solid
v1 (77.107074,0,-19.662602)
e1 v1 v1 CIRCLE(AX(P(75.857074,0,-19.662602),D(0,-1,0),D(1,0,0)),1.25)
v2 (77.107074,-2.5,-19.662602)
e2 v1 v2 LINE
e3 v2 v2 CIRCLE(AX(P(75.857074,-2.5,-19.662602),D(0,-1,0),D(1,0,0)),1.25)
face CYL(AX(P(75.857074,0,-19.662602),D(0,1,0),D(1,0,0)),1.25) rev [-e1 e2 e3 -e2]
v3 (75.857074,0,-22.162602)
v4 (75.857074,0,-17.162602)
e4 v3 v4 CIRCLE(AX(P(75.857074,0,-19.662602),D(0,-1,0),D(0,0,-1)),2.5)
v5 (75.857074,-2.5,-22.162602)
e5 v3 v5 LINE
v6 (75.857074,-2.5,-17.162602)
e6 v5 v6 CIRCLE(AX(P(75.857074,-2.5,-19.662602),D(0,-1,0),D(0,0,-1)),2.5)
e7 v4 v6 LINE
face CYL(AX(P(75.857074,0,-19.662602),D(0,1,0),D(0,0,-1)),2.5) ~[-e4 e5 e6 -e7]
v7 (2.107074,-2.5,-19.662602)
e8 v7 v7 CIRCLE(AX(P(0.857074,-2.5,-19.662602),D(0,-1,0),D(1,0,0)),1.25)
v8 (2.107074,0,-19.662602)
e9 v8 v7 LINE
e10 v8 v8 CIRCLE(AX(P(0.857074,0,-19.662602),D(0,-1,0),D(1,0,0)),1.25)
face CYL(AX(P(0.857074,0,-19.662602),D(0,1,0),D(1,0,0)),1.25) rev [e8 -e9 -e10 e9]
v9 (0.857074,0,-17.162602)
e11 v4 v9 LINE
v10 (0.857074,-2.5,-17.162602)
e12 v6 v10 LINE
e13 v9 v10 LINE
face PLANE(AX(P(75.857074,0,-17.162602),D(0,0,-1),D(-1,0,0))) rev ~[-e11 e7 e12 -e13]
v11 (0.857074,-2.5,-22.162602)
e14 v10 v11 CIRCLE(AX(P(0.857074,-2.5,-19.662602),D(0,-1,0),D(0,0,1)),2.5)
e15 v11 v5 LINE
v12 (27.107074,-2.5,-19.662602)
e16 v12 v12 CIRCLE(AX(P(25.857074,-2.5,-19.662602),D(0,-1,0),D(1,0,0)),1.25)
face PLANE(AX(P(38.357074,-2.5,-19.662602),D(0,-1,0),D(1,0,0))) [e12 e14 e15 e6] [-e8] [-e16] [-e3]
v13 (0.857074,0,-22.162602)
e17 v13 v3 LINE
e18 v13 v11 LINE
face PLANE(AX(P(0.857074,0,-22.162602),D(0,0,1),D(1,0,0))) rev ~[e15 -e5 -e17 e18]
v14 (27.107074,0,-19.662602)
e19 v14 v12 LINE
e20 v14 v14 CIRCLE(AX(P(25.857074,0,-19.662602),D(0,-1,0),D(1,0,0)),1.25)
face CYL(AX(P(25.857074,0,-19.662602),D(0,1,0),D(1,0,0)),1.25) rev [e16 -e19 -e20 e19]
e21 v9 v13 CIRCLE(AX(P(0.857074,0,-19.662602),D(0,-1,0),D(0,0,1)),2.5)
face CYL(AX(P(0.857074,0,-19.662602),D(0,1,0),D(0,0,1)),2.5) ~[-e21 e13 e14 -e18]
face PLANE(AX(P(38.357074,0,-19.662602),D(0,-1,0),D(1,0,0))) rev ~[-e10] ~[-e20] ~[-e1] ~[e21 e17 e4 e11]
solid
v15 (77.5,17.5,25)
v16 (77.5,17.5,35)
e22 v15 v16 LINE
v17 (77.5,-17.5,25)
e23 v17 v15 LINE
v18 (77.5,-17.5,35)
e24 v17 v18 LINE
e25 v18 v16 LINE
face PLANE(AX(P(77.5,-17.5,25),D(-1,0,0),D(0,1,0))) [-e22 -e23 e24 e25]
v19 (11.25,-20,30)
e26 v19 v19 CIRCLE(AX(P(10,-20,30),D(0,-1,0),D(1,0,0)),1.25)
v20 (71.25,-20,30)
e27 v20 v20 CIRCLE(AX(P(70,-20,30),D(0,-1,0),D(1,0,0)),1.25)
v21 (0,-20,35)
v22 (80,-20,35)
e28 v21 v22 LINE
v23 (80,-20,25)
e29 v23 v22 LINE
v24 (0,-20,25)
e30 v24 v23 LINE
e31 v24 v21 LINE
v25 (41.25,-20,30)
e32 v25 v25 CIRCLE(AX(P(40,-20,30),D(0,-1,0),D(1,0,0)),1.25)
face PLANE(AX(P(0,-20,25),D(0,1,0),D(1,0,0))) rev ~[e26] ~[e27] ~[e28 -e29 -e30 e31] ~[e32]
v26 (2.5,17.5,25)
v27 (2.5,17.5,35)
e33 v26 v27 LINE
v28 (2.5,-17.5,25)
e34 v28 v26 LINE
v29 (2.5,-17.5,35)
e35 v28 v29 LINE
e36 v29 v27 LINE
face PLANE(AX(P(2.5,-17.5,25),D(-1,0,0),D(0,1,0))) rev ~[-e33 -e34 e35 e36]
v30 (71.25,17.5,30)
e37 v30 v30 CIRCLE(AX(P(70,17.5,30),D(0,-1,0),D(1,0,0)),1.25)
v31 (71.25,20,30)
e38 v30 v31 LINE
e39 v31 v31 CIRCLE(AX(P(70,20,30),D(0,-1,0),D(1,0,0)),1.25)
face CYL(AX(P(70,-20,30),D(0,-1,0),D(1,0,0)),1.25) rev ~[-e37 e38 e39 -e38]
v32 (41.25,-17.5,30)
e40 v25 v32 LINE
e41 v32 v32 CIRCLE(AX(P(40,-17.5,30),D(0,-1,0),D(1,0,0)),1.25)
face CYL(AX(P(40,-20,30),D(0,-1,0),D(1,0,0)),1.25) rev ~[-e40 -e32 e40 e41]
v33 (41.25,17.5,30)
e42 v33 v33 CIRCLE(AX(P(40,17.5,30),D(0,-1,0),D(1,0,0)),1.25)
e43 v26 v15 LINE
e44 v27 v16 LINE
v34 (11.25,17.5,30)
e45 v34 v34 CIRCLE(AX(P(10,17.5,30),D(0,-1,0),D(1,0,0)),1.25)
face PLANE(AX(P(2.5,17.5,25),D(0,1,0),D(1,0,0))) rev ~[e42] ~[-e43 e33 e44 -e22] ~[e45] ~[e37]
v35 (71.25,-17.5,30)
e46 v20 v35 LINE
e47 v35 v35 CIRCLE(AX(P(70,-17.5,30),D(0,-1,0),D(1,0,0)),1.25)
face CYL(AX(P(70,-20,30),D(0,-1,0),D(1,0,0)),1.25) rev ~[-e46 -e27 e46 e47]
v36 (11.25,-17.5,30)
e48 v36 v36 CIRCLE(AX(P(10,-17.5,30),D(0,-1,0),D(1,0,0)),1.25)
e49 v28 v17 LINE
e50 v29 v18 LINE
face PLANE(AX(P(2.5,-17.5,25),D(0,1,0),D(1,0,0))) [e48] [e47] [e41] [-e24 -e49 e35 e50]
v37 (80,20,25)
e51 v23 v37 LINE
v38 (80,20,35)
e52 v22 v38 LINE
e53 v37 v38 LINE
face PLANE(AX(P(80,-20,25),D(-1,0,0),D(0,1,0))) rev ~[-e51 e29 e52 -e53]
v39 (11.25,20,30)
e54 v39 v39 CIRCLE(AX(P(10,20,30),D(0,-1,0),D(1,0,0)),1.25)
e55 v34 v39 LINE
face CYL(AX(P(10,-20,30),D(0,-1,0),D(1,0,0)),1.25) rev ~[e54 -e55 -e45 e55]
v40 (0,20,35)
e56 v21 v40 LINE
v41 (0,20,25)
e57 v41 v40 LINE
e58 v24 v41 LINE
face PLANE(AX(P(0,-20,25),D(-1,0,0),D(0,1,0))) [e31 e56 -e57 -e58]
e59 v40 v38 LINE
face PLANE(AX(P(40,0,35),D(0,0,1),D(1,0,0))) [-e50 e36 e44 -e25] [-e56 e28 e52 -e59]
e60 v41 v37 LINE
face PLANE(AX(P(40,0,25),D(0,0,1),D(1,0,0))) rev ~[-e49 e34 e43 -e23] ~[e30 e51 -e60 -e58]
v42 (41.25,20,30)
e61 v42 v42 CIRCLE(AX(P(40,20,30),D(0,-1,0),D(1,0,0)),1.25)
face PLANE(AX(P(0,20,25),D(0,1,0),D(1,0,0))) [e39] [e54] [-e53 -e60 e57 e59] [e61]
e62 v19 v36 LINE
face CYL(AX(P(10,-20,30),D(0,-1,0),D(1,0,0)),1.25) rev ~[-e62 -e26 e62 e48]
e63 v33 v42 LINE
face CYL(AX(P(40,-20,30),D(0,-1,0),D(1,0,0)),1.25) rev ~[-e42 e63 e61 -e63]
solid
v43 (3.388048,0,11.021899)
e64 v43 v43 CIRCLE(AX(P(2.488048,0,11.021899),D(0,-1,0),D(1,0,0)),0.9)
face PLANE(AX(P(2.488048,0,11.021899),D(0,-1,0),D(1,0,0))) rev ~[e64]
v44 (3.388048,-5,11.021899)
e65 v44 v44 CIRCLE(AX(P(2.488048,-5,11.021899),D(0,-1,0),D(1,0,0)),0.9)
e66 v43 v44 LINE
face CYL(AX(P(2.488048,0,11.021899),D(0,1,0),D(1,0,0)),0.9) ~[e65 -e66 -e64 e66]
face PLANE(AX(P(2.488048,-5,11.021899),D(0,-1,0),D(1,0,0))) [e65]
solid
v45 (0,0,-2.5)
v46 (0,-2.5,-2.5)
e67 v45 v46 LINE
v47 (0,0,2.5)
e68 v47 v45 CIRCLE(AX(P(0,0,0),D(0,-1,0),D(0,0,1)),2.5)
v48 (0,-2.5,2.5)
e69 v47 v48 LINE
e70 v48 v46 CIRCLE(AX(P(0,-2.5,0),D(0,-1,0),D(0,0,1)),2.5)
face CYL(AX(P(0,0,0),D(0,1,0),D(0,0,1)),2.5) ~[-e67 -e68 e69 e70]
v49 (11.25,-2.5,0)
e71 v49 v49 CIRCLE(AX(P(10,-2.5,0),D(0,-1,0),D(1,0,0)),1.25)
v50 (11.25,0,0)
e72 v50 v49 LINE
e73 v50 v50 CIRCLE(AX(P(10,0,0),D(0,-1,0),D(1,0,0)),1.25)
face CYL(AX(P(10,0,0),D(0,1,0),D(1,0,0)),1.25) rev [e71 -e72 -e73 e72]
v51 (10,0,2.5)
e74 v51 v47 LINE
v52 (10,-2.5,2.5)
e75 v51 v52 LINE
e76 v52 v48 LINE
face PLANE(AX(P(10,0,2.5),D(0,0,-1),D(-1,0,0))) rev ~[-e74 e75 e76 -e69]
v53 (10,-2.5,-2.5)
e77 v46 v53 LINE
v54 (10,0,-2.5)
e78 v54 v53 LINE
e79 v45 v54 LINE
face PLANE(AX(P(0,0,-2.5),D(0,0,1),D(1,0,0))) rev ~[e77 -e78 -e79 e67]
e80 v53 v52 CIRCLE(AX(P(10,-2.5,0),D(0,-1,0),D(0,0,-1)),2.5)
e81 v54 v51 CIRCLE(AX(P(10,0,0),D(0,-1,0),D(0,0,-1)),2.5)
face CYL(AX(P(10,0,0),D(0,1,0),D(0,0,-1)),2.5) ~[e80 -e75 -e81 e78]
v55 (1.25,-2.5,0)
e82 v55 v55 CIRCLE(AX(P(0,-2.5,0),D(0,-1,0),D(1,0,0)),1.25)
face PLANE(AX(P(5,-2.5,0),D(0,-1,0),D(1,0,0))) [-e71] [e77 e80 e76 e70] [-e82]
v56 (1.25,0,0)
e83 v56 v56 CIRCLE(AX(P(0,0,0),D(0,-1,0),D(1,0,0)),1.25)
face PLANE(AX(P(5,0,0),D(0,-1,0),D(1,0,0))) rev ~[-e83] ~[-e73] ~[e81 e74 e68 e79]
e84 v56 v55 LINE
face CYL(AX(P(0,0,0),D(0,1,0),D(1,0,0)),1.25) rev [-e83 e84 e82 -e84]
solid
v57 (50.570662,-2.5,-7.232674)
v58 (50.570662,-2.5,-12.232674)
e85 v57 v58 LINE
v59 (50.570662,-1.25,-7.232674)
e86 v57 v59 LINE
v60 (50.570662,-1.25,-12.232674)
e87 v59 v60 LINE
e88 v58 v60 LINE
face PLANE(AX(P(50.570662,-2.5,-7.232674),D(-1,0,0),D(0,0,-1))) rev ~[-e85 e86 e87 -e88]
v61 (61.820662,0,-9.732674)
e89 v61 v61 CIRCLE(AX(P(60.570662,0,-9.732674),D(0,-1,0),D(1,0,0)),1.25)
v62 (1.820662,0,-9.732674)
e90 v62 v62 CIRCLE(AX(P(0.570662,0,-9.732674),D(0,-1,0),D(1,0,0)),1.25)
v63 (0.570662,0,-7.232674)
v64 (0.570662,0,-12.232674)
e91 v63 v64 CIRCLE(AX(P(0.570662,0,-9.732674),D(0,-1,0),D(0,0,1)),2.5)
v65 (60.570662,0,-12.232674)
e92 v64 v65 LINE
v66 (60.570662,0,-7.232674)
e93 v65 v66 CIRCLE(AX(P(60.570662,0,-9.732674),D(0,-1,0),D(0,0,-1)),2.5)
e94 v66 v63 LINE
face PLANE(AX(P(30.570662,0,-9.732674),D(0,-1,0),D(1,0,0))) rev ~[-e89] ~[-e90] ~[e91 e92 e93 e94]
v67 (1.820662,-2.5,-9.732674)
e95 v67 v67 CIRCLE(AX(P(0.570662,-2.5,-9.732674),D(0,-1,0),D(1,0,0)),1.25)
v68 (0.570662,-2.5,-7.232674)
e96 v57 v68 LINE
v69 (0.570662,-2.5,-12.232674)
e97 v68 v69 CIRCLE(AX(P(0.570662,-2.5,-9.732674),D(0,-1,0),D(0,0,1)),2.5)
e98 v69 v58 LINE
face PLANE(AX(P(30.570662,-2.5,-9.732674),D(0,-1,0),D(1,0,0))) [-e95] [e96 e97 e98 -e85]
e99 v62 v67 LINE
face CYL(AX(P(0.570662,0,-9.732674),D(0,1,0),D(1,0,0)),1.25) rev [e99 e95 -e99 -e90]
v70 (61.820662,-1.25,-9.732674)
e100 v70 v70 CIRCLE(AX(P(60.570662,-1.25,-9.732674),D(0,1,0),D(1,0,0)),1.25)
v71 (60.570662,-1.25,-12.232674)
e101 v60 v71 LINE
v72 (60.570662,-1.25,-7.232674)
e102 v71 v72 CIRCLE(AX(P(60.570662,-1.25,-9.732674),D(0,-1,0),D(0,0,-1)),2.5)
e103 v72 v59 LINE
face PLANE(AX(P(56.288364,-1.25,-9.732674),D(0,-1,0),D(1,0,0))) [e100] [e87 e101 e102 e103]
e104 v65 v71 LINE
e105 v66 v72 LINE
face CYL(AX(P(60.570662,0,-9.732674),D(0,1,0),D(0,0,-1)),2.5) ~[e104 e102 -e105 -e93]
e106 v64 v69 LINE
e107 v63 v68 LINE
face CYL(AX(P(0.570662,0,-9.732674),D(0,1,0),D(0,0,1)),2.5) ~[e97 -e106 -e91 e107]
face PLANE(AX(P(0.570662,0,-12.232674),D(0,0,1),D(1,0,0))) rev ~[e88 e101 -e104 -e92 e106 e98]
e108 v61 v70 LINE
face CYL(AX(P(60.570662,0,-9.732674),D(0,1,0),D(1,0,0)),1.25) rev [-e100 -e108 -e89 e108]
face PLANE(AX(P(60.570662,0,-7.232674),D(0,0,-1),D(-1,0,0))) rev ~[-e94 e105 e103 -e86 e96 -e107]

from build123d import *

# Parameters (mm, degrees)
F1_R      = 1.25
F2_DEPTH  = 2.5
F3_R      = 1.25
F4_DEPTH  = 2.5
F5_R      = 1.25
F6_DEPTH  = 2.5
F8_W      = 80
F8_H      = 40
F8_W_2    = 75
F8_H_2    = 35
F9_DEPTH  = 10
F10_R     = 1.25
F11_DEPTH = 40.001
F12_R     = 0.9
F13_DEPTH = 5
F15_DEPTH = 1.25


with BuildPart() as f2:
    # F1 (on Front) → F2 (new body)
    with BuildSketch(Plane.XZ):
        with BuildLine():
            Line((10, 2.5), (0, 2.5))
            ThreePointArc((0, 2.5), (-2.5, 0), (0, -2.5))
            Line((0, -2.5), (10, -2.5))
            ThreePointArc((10, -2.5), (12.5, 0), (10, 2.5))
        make_face()
        Circle(F1_R, mode=Mode.SUBTRACT)
        with Locations((10, 0)):
            Circle(F1_R, mode=Mode.SUBTRACT)
    extrude(amount=F2_DEPTH)


with BuildPart() as f4:
    # F3 (on Front) → F4 (new body)
    with BuildSketch(Plane.XZ):
        with BuildLine():
            Line((60.5706622079, -7.232673876), (0.5706622079, -7.232673876))
            ThreePointArc((0.5706622079, -7.232673876), (-1.9293377921, -9.732673876), (0.5706622079, -12.232673876))
            Line((0.5706622079, -12.232673876), (60.5706622079, -12.232673876))
            ThreePointArc((60.5706622079, -12.232673876), (63.0706622079, -9.732673876), (60.5706622079, -7.232673876))
        make_face()
        with Locations((0.5706622079, -9.732673876)):
            Circle(F3_R, mode=Mode.SUBTRACT)
        with Locations((60.5706622079, -9.732673876)):
            Circle(F3_R, mode=Mode.SUBTRACT)
    extrude(amount=F4_DEPTH)

    # F14 (on face) → F15 (cut)
    with BuildSketch(Plane.XZ.offset(2.5)):
        with BuildLine():
            Line((50.5706622079, -12.232673876), (60.5706622079, -12.232673876))
            ThreePointArc((60.5706622079, -12.232673876), (63.0706622079, -9.732673876), (60.5706622079, -7.232673876))
            Line((60.5706622079, -7.232673876), (50.5706622079, -7.232673876))
            Line((50.5706622079, -7.232673876), (50.5706622079, -12.232673876))
        make_face()
    extrude(amount=-F15_DEPTH, mode=Mode.SUBTRACT)


with BuildPart() as f6:
    # F5 (on Front) → F6 (new body)
    with BuildSketch(Plane.XZ):
        with BuildLine():
            Line((75.8570737601, -17.1626018733), (0.8570737601, -17.1626018733))
            ThreePointArc((0.8570737601, -17.1626018733), (-1.6429262399, -19.6626018733), (0.8570737601, -22.1626018733))
            Line((0.8570737601, -22.1626018733), (75.8570737601, -22.1626018733))
            ThreePointArc((75.8570737601, -22.1626018733), (78.3570737601, -19.6626018733), (75.8570737601, -17.1626018733))
        make_face()
        with Locations((0.8570737601, -19.6626018733)):
            Circle(F5_R, mode=Mode.SUBTRACT)
        with Locations((25.8570737601, -19.6626018733)):
            Circle(F5_R, mode=Mode.SUBTRACT)
        with Locations((75.8570737601, -19.6626018733)):
            Circle(F5_R, mode=Mode.SUBTRACT)
    extrude(amount=F6_DEPTH)


with BuildPart() as f9:
    # F8 (on offset) → F9 (new body)
    with BuildSketch(Plane.XY.offset(25)):
        with Locations((40, 0)):
            Rectangle(F8_W, F8_H)
        with Locations((40, 0)):
            Rectangle(F8_W_2, F8_H_2, mode=Mode.SUBTRACT)
    extrude(amount=F9_DEPTH)

    # F10 (on face) → F11 (cut, through all)
    with BuildSketch(Plane.XZ.offset(20)):
        with Locations((10, 30)):
            Circle(F10_R)
        with Locations((70, 30)):
            Circle(F10_R)
        with Locations((40, 30)):
            Circle(F10_R)
    extrude(amount=-F11_DEPTH, mode=Mode.SUBTRACT)


with BuildPart() as f13:
    # F12 (on Front) → F13 (new body)
    with BuildSketch(Plane.XZ):
        with Locations((2.488047583, 11.0218990594)):
            Circle(F12_R)
    extrude(amount=F13_DEPTH)


solid = Compound([f2.part, f4.part, f6.part, f9.part, f13.part])
